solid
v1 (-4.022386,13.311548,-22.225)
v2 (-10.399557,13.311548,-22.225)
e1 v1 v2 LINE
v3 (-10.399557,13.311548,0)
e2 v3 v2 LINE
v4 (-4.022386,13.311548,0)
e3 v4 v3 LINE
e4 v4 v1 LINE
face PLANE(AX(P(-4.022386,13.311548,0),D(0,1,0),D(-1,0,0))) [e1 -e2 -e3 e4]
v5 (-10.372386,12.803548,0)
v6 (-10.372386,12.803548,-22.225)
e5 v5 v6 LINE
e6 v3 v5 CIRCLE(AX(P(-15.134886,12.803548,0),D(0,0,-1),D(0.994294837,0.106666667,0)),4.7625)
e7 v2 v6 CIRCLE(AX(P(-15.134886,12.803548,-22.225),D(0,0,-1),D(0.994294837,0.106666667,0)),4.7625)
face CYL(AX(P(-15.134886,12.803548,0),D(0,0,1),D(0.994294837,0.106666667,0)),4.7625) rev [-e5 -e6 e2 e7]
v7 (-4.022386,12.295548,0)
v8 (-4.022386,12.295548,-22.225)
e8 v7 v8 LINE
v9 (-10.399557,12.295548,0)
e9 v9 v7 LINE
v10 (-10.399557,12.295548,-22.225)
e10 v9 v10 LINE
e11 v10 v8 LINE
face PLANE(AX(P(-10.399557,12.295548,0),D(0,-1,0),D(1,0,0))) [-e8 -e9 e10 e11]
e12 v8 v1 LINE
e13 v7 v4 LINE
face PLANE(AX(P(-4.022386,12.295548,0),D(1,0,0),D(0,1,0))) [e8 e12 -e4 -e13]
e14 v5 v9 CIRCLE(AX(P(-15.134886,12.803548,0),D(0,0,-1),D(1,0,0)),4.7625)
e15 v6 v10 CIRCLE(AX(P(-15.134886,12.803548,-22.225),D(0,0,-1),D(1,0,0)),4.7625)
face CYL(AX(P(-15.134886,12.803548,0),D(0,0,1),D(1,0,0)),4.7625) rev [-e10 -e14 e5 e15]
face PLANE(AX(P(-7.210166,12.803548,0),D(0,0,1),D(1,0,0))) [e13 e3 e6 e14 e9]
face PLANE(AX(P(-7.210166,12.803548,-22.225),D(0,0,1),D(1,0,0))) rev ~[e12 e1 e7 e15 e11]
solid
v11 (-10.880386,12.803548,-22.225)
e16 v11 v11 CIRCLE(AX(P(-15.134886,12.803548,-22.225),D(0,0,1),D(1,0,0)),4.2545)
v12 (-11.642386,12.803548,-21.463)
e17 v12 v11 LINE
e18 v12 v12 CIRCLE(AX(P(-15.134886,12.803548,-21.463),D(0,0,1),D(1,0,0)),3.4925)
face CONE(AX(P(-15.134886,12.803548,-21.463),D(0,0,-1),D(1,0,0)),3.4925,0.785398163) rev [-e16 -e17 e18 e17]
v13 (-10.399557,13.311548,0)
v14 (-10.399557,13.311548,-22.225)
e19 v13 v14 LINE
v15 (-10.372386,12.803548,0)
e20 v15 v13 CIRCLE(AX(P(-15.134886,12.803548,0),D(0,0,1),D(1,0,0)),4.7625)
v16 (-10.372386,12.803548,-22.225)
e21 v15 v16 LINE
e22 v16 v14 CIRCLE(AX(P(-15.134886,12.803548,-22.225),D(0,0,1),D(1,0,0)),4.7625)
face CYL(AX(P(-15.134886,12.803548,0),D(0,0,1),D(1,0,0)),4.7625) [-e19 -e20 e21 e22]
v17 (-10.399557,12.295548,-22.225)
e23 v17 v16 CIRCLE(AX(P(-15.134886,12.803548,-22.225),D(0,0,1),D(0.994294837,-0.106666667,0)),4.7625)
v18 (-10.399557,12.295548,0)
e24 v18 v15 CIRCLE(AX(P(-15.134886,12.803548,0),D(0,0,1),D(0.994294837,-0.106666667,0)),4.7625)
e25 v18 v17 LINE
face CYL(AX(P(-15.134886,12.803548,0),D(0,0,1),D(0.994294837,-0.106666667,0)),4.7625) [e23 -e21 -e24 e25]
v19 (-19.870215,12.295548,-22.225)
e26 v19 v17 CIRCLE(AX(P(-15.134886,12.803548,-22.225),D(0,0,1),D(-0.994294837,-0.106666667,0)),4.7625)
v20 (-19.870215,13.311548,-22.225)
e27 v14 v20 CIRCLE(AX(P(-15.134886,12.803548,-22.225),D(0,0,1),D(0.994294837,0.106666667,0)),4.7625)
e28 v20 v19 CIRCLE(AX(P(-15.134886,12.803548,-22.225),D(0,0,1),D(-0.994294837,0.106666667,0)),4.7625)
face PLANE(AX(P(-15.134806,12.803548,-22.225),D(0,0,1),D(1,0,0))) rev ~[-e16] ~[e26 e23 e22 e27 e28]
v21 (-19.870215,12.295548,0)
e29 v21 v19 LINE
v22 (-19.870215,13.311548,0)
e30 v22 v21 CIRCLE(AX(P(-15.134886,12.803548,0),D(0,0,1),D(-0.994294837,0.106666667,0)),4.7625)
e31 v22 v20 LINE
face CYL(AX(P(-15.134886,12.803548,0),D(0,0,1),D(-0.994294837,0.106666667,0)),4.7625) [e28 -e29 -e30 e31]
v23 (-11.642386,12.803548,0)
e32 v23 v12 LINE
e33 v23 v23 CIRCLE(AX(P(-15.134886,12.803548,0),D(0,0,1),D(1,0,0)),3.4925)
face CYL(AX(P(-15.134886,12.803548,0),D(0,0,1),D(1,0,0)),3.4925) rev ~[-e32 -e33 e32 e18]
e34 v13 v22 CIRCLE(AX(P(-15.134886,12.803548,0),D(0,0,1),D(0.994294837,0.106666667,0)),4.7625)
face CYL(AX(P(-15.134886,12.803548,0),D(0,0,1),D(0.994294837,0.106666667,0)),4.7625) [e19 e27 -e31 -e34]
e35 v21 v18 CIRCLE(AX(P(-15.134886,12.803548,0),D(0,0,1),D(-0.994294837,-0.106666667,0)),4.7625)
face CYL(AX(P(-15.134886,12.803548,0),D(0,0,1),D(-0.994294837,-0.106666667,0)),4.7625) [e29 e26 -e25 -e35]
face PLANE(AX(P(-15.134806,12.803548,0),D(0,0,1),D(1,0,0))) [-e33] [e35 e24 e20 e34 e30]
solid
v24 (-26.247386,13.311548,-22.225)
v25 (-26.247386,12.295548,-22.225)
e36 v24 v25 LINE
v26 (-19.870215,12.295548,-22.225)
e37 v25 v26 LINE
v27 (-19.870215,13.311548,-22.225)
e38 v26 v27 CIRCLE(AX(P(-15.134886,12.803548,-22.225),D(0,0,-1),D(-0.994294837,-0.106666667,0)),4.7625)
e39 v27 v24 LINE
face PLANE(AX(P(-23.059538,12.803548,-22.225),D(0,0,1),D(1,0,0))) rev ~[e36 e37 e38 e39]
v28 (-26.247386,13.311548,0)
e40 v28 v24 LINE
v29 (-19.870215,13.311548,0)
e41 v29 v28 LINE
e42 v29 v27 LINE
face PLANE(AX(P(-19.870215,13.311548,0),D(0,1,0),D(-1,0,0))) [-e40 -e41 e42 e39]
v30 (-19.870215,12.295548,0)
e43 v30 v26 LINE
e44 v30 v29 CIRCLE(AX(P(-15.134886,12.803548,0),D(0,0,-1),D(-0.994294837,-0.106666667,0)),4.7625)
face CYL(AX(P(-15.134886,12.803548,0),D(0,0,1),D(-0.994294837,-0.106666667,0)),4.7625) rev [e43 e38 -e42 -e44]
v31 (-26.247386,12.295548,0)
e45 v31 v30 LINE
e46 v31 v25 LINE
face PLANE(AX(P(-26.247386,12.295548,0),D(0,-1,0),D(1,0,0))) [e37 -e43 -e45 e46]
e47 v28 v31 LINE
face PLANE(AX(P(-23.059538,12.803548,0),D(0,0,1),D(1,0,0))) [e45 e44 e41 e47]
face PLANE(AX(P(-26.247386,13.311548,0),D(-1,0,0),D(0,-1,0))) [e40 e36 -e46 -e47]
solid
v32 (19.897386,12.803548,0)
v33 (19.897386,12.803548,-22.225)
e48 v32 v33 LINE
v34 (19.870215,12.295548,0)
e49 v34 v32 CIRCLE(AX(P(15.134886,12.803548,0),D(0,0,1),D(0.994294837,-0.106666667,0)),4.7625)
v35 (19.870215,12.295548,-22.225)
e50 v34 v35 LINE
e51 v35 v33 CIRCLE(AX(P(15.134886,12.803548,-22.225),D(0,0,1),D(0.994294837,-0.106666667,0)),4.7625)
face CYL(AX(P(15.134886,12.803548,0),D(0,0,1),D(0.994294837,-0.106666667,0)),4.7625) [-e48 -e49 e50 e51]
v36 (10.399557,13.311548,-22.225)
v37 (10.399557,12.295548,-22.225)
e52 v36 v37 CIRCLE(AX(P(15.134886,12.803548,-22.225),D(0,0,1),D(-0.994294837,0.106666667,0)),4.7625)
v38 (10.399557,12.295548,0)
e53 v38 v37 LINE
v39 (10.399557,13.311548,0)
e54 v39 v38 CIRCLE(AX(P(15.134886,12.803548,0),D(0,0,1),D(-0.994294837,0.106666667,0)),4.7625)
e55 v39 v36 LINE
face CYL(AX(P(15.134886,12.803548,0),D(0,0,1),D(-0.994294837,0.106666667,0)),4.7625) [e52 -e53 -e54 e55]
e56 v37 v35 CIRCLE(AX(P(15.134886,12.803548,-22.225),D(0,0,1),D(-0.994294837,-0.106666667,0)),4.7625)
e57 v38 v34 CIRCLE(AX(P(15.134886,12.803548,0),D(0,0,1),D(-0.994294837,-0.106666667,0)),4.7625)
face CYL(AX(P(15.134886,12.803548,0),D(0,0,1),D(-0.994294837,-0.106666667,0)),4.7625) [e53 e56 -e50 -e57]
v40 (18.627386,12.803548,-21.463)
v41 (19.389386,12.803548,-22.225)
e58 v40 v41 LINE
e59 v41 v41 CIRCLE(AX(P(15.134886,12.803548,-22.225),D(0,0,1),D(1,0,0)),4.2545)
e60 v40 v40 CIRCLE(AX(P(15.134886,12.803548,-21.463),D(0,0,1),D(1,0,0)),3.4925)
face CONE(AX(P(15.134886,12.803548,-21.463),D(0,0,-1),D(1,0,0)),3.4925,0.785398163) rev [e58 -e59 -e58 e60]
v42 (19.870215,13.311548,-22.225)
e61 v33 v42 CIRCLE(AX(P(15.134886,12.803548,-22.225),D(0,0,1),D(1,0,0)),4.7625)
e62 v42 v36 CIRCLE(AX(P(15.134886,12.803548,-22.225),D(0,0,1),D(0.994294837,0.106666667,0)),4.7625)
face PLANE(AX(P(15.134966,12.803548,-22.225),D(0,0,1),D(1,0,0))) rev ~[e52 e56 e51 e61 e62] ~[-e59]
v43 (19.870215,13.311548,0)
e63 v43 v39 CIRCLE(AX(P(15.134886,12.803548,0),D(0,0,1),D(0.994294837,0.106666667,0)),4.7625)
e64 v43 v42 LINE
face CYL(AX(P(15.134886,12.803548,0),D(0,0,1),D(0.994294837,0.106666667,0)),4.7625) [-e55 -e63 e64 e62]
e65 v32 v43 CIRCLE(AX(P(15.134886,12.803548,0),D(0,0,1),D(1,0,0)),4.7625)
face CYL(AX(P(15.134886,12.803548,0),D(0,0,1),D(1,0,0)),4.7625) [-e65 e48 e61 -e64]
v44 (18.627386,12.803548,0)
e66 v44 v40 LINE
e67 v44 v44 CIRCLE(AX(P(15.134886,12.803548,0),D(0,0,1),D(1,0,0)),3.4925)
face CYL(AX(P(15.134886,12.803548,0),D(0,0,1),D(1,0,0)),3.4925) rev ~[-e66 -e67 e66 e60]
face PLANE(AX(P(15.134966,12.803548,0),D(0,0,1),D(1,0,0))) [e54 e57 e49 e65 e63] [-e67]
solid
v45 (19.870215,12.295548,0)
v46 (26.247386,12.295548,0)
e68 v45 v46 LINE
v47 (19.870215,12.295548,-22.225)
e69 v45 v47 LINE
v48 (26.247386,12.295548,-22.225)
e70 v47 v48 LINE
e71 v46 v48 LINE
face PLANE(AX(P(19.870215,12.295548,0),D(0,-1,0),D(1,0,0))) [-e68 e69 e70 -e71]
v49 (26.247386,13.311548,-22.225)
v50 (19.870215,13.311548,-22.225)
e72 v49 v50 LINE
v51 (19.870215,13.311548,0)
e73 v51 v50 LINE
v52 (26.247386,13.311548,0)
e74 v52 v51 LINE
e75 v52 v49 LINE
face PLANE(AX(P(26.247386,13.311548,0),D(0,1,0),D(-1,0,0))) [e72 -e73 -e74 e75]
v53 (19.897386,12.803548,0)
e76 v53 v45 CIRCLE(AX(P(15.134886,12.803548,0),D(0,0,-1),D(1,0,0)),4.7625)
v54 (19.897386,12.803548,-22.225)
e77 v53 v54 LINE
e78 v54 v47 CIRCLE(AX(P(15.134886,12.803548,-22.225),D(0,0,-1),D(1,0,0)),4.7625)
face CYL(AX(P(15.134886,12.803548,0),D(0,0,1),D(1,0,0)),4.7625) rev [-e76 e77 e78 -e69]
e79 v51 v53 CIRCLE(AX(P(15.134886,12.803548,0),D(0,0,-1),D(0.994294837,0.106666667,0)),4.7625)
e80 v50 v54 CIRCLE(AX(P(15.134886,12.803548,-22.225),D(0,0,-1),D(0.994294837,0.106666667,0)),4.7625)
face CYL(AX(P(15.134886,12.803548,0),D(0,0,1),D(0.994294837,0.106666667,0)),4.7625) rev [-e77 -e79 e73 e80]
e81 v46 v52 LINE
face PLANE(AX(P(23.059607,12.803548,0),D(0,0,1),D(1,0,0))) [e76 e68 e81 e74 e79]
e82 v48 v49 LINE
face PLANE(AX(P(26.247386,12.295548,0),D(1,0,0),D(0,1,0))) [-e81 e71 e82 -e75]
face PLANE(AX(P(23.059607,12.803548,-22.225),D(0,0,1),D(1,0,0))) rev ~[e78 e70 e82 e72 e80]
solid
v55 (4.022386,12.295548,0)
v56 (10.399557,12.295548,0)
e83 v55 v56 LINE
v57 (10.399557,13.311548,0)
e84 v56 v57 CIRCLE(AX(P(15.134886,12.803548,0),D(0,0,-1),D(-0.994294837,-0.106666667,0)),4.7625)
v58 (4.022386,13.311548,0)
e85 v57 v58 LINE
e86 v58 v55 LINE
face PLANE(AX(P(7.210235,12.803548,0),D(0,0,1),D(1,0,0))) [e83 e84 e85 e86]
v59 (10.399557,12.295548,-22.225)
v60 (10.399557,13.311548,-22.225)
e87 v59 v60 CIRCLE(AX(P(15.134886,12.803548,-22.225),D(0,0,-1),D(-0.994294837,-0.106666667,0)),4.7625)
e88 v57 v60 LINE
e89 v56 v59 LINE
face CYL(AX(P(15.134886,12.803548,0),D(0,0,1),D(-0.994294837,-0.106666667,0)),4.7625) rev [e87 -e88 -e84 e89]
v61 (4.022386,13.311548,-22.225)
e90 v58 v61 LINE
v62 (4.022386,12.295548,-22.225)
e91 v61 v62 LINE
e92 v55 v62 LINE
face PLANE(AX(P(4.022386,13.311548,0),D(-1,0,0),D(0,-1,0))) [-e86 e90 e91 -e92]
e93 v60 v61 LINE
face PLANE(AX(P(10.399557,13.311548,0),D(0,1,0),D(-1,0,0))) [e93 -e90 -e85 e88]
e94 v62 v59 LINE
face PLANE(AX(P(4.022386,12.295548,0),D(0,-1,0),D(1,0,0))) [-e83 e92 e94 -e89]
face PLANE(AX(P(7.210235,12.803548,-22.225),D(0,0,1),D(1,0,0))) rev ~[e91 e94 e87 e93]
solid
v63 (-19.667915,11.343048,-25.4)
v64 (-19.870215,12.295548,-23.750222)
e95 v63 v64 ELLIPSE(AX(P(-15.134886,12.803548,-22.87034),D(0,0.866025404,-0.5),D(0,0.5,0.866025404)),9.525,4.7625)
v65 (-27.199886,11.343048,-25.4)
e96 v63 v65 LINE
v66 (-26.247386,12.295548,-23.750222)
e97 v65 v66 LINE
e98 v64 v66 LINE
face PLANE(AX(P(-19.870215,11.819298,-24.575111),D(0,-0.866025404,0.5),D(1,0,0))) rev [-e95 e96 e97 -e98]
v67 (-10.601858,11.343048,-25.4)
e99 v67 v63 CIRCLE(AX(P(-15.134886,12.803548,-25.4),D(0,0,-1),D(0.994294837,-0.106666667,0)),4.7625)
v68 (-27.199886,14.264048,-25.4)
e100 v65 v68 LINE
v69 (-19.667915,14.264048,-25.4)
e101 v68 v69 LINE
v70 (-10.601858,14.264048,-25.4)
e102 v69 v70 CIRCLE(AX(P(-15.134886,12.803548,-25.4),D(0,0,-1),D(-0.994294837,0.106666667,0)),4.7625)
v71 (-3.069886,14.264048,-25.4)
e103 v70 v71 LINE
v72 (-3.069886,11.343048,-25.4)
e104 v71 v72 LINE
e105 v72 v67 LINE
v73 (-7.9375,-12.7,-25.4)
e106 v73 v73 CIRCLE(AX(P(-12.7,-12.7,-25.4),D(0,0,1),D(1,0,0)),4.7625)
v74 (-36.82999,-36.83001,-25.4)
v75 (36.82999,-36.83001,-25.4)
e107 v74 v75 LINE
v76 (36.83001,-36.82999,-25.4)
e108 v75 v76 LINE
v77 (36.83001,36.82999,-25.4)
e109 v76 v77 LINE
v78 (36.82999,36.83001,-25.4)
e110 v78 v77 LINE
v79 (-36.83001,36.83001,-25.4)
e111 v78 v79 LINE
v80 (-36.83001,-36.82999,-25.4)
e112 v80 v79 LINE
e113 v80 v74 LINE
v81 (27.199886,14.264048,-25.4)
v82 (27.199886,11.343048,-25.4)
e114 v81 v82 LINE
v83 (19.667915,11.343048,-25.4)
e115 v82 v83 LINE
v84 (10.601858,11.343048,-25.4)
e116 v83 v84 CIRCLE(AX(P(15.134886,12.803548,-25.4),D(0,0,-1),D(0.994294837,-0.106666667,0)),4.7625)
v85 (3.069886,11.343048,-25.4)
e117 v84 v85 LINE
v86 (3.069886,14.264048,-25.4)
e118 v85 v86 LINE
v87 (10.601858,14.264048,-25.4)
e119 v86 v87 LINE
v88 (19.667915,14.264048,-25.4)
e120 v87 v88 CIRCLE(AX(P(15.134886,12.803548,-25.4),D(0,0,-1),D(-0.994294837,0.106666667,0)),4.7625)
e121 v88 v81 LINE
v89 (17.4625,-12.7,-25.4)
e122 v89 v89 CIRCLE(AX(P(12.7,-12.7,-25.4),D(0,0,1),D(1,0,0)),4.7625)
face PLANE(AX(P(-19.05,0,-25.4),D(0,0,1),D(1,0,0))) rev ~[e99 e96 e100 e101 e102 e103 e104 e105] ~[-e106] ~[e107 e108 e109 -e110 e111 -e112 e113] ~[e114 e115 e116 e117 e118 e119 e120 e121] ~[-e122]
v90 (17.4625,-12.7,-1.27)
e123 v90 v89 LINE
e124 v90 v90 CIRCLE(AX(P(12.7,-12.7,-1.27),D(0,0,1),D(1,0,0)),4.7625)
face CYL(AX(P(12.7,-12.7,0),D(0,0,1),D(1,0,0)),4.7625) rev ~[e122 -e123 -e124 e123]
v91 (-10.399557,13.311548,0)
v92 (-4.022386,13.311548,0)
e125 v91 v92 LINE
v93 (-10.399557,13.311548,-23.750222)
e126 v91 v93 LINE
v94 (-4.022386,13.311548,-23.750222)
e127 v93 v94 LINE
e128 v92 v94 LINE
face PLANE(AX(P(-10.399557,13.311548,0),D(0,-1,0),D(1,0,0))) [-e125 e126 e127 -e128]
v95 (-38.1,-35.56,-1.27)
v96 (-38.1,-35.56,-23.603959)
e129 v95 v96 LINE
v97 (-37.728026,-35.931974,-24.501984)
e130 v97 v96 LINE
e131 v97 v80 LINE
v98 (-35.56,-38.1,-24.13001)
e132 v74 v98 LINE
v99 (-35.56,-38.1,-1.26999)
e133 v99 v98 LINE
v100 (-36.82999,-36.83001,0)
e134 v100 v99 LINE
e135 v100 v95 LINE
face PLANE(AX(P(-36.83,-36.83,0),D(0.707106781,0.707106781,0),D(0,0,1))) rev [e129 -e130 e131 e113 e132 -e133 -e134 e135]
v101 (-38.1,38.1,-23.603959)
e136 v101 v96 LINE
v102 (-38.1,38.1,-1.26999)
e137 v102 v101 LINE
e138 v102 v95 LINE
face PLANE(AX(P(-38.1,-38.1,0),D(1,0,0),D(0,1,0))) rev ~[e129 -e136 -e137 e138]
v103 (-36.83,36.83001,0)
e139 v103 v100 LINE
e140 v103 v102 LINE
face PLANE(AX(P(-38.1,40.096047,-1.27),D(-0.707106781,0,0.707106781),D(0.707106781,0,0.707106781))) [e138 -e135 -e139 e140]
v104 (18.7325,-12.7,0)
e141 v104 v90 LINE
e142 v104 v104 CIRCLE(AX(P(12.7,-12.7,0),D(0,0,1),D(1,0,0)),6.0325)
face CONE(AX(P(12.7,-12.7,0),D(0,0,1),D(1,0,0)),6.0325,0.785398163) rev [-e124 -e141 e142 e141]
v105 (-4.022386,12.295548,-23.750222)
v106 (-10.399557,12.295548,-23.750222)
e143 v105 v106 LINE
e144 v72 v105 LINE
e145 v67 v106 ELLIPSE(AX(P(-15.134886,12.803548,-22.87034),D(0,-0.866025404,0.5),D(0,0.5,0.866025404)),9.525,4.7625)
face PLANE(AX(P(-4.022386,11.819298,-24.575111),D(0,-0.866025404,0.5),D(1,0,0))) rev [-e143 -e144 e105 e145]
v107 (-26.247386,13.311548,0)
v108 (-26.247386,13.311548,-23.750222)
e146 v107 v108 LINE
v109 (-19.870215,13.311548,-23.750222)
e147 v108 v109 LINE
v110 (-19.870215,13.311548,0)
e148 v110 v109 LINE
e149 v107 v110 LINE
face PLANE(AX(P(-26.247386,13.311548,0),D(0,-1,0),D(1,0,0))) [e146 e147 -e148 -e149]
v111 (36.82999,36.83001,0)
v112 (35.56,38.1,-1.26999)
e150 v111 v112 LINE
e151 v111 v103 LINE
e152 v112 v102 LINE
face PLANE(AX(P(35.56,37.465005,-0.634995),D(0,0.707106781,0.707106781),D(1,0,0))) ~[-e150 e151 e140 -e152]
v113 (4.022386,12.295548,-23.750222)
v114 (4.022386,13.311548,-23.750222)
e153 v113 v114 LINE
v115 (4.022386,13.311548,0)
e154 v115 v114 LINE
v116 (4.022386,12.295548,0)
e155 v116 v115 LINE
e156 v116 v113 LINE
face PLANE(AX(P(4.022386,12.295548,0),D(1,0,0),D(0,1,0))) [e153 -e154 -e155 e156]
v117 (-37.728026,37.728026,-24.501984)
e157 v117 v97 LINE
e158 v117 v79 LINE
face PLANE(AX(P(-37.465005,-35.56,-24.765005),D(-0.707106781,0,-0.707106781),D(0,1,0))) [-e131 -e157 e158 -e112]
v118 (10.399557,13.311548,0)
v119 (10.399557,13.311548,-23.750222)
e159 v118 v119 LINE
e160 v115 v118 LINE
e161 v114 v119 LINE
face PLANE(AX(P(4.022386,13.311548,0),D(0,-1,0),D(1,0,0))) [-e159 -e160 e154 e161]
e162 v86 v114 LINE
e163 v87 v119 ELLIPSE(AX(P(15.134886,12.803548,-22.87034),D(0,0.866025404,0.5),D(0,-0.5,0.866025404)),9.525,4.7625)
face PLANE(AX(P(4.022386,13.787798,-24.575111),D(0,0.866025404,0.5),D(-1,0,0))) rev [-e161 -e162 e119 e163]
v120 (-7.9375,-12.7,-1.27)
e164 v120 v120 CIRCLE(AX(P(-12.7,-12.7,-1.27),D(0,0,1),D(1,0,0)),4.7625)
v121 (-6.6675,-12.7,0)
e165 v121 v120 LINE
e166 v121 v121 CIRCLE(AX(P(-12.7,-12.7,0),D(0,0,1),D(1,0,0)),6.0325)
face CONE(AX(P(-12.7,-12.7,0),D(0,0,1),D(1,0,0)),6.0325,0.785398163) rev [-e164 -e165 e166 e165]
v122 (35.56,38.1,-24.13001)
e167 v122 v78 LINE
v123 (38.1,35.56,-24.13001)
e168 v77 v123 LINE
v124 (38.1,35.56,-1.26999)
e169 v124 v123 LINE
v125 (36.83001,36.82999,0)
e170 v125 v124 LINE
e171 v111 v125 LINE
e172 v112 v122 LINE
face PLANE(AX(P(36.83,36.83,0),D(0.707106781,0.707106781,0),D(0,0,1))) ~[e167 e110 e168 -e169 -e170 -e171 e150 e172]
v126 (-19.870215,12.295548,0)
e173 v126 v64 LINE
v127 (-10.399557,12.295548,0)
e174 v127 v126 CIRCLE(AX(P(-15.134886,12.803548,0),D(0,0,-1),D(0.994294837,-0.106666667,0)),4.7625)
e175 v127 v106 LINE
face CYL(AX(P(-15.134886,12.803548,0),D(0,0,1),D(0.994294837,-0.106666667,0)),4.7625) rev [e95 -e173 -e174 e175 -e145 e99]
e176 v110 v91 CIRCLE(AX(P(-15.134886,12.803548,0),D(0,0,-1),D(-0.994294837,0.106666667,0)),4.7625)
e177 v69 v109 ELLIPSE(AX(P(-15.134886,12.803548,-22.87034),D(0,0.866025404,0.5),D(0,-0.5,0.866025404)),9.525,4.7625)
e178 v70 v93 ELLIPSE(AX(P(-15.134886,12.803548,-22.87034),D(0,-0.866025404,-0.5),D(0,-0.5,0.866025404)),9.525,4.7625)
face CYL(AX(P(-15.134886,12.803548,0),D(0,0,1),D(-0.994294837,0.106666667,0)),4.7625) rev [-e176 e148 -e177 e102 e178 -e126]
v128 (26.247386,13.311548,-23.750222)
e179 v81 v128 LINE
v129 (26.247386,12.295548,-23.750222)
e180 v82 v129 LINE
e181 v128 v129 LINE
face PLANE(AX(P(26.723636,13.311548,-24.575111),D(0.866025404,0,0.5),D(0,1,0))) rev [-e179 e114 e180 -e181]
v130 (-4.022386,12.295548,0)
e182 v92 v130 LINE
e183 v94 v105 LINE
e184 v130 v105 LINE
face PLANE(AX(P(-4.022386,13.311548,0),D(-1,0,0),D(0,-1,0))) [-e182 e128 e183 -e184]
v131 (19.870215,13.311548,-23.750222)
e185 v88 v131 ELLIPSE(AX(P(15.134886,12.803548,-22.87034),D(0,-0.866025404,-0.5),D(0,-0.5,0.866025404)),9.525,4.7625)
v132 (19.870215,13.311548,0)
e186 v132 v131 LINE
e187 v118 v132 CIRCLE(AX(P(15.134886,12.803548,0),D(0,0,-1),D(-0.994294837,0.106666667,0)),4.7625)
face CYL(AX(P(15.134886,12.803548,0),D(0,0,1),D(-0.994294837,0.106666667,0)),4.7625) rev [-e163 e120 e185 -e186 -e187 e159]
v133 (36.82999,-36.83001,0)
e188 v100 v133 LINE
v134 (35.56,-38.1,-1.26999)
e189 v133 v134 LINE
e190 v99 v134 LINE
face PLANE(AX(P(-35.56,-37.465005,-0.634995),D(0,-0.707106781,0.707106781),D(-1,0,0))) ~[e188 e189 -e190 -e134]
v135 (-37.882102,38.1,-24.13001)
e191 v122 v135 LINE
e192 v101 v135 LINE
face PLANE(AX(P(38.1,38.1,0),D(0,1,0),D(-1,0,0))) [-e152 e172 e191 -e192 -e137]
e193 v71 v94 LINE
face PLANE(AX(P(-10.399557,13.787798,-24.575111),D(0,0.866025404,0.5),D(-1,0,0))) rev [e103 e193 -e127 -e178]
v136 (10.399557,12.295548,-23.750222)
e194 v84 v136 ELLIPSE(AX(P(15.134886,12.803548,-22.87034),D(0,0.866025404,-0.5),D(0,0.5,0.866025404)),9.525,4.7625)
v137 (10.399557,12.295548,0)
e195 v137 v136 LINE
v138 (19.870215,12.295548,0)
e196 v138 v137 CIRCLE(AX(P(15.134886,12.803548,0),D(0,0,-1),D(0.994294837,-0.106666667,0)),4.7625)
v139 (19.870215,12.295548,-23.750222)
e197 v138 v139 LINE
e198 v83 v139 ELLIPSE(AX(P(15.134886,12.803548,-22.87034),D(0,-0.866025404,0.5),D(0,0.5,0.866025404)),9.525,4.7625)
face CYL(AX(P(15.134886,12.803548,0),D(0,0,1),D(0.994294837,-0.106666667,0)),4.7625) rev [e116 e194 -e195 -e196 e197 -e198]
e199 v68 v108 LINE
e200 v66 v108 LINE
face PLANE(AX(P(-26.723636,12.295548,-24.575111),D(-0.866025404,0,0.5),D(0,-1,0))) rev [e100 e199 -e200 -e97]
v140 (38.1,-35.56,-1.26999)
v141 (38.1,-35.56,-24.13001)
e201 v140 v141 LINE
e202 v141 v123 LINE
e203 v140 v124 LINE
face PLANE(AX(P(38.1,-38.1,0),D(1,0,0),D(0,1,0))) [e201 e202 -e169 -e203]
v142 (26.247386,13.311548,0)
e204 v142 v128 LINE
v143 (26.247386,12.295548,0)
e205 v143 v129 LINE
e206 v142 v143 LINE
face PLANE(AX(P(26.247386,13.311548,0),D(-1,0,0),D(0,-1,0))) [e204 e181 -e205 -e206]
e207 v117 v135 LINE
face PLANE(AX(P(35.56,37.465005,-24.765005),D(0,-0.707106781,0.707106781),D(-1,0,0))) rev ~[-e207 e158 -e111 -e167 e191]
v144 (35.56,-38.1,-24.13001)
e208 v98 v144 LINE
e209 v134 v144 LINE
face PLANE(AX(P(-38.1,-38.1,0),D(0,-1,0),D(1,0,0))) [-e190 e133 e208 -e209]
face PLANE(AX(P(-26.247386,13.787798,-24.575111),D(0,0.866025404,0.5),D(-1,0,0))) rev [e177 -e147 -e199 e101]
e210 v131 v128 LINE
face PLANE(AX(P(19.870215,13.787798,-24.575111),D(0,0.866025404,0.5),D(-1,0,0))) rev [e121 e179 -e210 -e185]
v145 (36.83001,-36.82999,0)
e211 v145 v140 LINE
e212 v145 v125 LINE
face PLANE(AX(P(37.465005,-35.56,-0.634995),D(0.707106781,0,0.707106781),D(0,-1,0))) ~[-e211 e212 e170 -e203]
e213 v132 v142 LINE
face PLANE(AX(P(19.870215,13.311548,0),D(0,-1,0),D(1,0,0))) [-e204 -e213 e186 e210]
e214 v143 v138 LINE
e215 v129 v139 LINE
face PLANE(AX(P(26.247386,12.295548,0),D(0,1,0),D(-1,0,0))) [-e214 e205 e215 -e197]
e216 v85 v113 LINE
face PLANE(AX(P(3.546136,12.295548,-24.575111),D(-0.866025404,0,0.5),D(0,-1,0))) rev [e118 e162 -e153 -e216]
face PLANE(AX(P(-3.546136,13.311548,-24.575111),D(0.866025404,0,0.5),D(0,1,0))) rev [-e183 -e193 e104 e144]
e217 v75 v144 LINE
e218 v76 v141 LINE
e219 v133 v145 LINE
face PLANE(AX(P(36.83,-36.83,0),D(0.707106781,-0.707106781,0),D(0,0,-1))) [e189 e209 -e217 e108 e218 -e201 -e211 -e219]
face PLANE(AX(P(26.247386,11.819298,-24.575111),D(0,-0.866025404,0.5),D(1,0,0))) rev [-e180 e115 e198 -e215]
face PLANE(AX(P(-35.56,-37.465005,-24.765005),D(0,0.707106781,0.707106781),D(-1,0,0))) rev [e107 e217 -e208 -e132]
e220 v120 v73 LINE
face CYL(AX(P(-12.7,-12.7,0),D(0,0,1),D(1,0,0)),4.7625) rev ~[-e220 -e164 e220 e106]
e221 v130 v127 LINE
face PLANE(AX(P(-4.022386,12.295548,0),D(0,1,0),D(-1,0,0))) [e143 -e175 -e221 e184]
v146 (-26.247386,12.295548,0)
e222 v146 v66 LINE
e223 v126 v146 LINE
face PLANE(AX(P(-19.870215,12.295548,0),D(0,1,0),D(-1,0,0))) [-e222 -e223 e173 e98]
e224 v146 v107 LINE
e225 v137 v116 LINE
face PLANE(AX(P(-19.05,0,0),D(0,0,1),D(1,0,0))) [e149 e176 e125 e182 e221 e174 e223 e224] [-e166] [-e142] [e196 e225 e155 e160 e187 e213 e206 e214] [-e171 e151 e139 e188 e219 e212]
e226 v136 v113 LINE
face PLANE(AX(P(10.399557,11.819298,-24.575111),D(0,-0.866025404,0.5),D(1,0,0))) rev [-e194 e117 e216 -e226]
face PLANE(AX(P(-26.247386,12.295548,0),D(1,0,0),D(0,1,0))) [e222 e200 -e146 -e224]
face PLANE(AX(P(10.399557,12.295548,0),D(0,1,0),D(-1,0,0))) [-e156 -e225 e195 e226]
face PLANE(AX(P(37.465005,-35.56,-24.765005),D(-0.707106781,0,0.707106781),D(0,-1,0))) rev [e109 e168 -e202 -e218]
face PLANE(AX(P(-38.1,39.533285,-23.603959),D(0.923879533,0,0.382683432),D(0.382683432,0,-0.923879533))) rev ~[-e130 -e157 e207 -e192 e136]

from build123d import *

# Parameters (mm, degrees)
F0_W        = 38.1
F0_H        = 76.2
F0_R        = 4.7625
F1_DEPTH    = 25.4
F2_SIZE     = 2.54
F3_SIZE     = 1.26999
F4_T1_DEPTH = 78.9220847894
F4_T3_DEPTH = 76.5265699849
F0_R_2      = 3.4925
F5_DEPTH    = 22.225
F6_DEPTH    = 22.225
F7_DEPTH    = 22.225
F8_SIZE     = 0.762
F8_2_SIZE   = 0.762
F9_SIZE2    = 1.6497783942
F9_SIZE     = 0.9525


# Not quite as in the source:
# - a fillet or chamfer that OpenCascade refuses, or shapes differently, is made with other operations: its cross-section is extruded or revolved along the edge and cut away or added
# - a fillet or chamfer is up to 0.001 mm smaller than in the source, because OpenCascade refuses the exact size


with BuildPart() as f1:
    # F0 (on Top) → F1 (new body)
    with BuildSketch(Plane.XY):
        with Locations((-19.05, 0)):
            Rectangle(F0_W, F0_H)
        with Locations((-12.7, -12.7)):
            Circle(F0_R, mode=Mode.SUBTRACT)
        with BuildLine():
            ThreePointArc((-19.8702153916, 13.3115481797), (-15.134886232, 17.5660481797), (-10.3995570724, 13.3115481797))
            Line((-10.3995570724, 13.3115481797), (-4.022386232, 13.3115481797))
            Line((-4.022386232, 13.3115481797), (-4.022386232, 12.2955481797))
            Line((-4.022386232, 12.2955481797), (-10.3995570724, 12.2955481797))
            ThreePointArc((-10.3995570724, 12.2955481797), (-15.134886232, 8.0410481797), (-19.8702153916, 12.2955481797))
            Line((-19.8702153916, 12.2955481797), (-26.247386232, 12.2955481797))
            Line((-26.247386232, 12.2955481797), (-26.247386232, 13.3115481797))
            Line((-26.247386232, 13.3115481797), (-19.8702153916, 13.3115481797))
        make_face(mode=Mode.SUBTRACT)
        with Locations((19.05, 0)):
            Rectangle(F0_W, F0_H)
        with Locations((12.7, -12.7)):
            Circle(F0_R, mode=Mode.SUBTRACT)
        with BuildLine():
            ThreePointArc((10.3995570724, 13.3115481797), (15.134886232, 17.5660481797), (19.8702153916, 13.3115481797))
            Line((19.8702153916, 13.3115481797), (26.247386232, 13.3115481797))
            Line((26.247386232, 13.3115481797), (26.247386232, 12.2955481797))
            Line((26.247386232, 12.2955481797), (19.8702153916, 12.2955481797))
            ThreePointArc((19.8702153916, 12.2955481797), (15.134886232, 8.0410481797), (10.3995570724, 12.2955481797))
            Line((10.3995570724, 12.2955481797), (4.022386232, 12.2955481797))
            Line((4.022386232, 12.2955481797), (4.022386232, 13.3115481797))
            Line((4.022386232, 13.3115481797), (10.3995570724, 13.3115481797))
        make_face(mode=Mode.SUBTRACT)
    extrude(amount=-F1_DEPTH)

    # F2
    f2_edges = [f1.edges().sort_by_distance(p)[0] for p in [
        (38.1, -38.1, -12.7),
        (38.1, 38.1, -12.7),
        (-38.1, -38.1, -12.7),
    ]]
    chamfer(f2_edges, length=F2_SIZE)

    # F3 (size 1.27 in the source; OpenCascade refuses exactly that, so slightly less here)
    f3_edges = [f1.edges().sort_by_distance(p)[0] for p in [
        (0, -38.1, 0),
        (-1.27, 38.1, 0),
        (38.1, 0, 0),
        (38.1, 0, -25.4),
        (0, -38.1, -25.4),
        (-1.27, 38.1, -25.4),
        (-38.1, 1.27, -25.4),
    ]]
    chamfer(f3_edges, length=F3_SIZE)

    # F4: chamfer of 1.27 on 4 edges, made by hand

    # F4_s2 → F4_t1 (cut)
    with BuildSketch(Plane.XZ.offset(-40.0960473947)):
        Polygon((-38.1, -1.27), (-36.83, 0), (-38.1, 0), align=None)
    extrude(amount=F4_T1_DEPTH, mode=Mode.SUBTRACT)

    # F4_s4 → F4_t3 (cut)
    with BuildSketch(Plane.XZ.offset(-39.5332849925)):
        Polygon((-38.1, -23.6039587758), (-37.7280256121, -24.5019843879), (-38.1, -24.13001), align=None)
    extrude(amount=F4_T3_DEPTH, mode=Mode.SUBTRACT)

    # F4_s5 → F4_t6 (revolve, cut)
    with BuildSketch(Plane.XZ.offset(12.7)):
        Polygon((-6.6675, 0), (-7.9375, -1.27), (-7.9375, 0), align=None)
    revolve(axis=Axis((-12.7, -12.7, 0), (0, 0, 1)), mode=Mode.SUBTRACT)

    # F4_s7 → F4_t8 (revolve, cut)
    with BuildSketch(Plane.XZ.offset(12.7)):
        Polygon((18.7325, 0), (17.4625, -1.27), (17.4625, 0), align=None)
    revolve(axis=Axis((12.7, -12.7, 0), (0, 0, 1)), mode=Mode.SUBTRACT)

    # F9
    f9_edges = [f1.edges().sort_by_distance(p)[0] for p in [
        (-23.058801, 12.295548, -25.4),
        (-26.247386, 12.803548, -25.4),
        (-23.058801, 13.311548, -25.4),
        (-7.210972, 12.295548, -25.4),
        (-4.022386, 12.803548, -25.4),
        (-7.210972, 13.311548, -25.4),
        (7.210972, 12.295548, -25.4),
        (4.022386, 12.803548, -25.4),
        (7.210972, 13.311548, -25.4),
        (23.058801, 12.295548, -25.4),
        (23.058801, 13.311548, -25.4),
        (26.247386, 12.803548, -25.4),
    ]]
    f9_side = f1.faces().sort_by_distance((0, -0.067575, -25.4))[0]
    chamfer(f9_edges, length=F9_SIZE, length2=F9_SIZE2, reference=f9_side)


with BuildPart() as f5:
    # F0 (on Top) → F5 (new body)
    with BuildSketch(Plane.XY):
        with BuildLine():
            ThreePointArc((19.8702153916, 12.2955481797), (19.8905886708, 12.549185125), (19.897386232, 12.8035481797))
            ThreePointArc((19.897386232, 12.8035481797), (19.8905886708, 13.0579112345), (19.8702153916, 13.3115481797))
            ThreePointArc((19.8702153916, 13.3115481797), (15.134886232, 17.5660481797), (10.3995570724, 13.3115481797))
            ThreePointArc((10.3995570724, 13.3115481797), (10.372386232, 12.8035481797), (10.3995570724, 12.2955481797))
            ThreePointArc((10.3995570724, 12.2955481797), (15.134886232, 8.0410481797), (19.8702153916, 12.2955481797))
        make_face()
        with Locations((15.134886232, 12.8035481797)):
            Circle(F0_R_2, mode=Mode.SUBTRACT)
    extrude(amount=-F5_DEPTH)

    # F8
    f8_edges = [f5.edges().sort_by_distance(p)[0] for p in [
        (11.642386, 12.803548, -22.225),
    ]]
    chamfer(f8_edges, length=F8_SIZE)


with BuildPart() as f5b:
    # F0 (on Top) → F5, piece 2 (new body)
    with BuildSketch(Plane.XY):
        with BuildLine():
            ThreePointArc((-10.3995570724, 12.2955481797), (-10.3791837932, 12.549185125), (-10.372386232, 12.8035481797))
            ThreePointArc((-10.372386232, 12.8035481797), (-10.3791837932, 13.0579112345), (-10.3995570724, 13.3115481797))
            ThreePointArc((-10.3995570724, 13.3115481797), (-15.134886232, 17.5660481797), (-19.8702153916, 13.3115481797))
            ThreePointArc((-19.8702153916, 13.3115481797), (-19.897386232, 12.8035481797), (-19.8702153916, 12.2955481797))
            ThreePointArc((-19.8702153916, 12.2955481797), (-15.134886232, 8.0410481797), (-10.3995570724, 12.2955481797))
        make_face()
        with Locations((-15.134886232, 12.8035481797)):
            Circle(F0_R_2, mode=Mode.SUBTRACT)
    extrude(amount=-F5_DEPTH)

    # F8#2
    f8_2_edges = [f5b.edges().sort_by_distance(p)[0] for p in [
        (-18.627386, 12.803548, -22.225),
    ]]
    chamfer(f8_2_edges, length=F8_2_SIZE)


with BuildPart() as f6:
    # F0 (on Top) → F6 (new body)
    with BuildSketch(Plane.XY):
        with BuildLine():
            ThreePointArc((-10.3995570724, 13.3115481797), (-10.3791837932, 13.0579112345), (-10.372386232, 12.8035481797))
            ThreePointArc((-10.372386232, 12.8035481797), (-10.3791837932, 12.549185125), (-10.3995570724, 12.2955481797))
            Line((-10.3995570724, 12.2955481797), (-4.022386232, 12.2955481797))
            Line((-4.022386232, 12.2955481797), (-4.022386232, 13.3115481797))
            Line((-4.022386232, 13.3115481797), (-10.3995570724, 13.3115481797))
        make_face()
    extrude(amount=-F6_DEPTH)


with BuildPart() as f6b:
    # F0 (on Top) → F6, piece 2 (new body)
    with BuildSketch(Plane.XY):
        with BuildLine():
            ThreePointArc((-19.8702153916, 12.2955481797), (-19.897386232, 12.8035481797), (-19.8702153916, 13.3115481797))
            Line((-19.8702153916, 13.3115481797), (-26.247386232, 13.3115481797))
            Line((-26.247386232, 13.3115481797), (-26.247386232, 12.2955481797))
            Line((-26.247386232, 12.2955481797), (-19.8702153916, 12.2955481797))
        make_face()
    extrude(amount=-F6_DEPTH)


with BuildPart() as f7:
    # F0 (on Top) → F7 (new body)
    with BuildSketch(Plane.XY):
        with BuildLine():
            ThreePointArc((10.3995570724, 12.2955481797), (10.372386232, 12.8035481797), (10.3995570724, 13.3115481797))
            Line((10.3995570724, 13.3115481797), (4.022386232, 13.3115481797))
            Line((4.022386232, 13.3115481797), (4.022386232, 12.2955481797))
            Line((4.022386232, 12.2955481797), (10.3995570724, 12.2955481797))
        make_face()
    extrude(amount=-F7_DEPTH)


with BuildPart() as f7b:
    # F0 (on Top) → F7, piece 2 (new body)
    with BuildSketch(Plane.XY):
        with BuildLine():
            ThreePointArc((19.8702153916, 13.3115481797), (19.8905886708, 13.0579112345), (19.897386232, 12.8035481797))
            ThreePointArc((19.897386232, 12.8035481797), (19.8905886708, 12.549185125), (19.8702153916, 12.2955481797))
            Line((19.8702153916, 12.2955481797), (26.247386232, 12.2955481797))
            Line((26.247386232, 12.2955481797), (26.247386232, 13.3115481797))
            Line((26.247386232, 13.3115481797), (19.8702153916, 13.3115481797))
        make_face()
    extrude(amount=-F7_DEPTH)


solid = Compound([f1.part, f5.part, f5b.part, f6.part, f6b.part, f7.part, f7b.part])
